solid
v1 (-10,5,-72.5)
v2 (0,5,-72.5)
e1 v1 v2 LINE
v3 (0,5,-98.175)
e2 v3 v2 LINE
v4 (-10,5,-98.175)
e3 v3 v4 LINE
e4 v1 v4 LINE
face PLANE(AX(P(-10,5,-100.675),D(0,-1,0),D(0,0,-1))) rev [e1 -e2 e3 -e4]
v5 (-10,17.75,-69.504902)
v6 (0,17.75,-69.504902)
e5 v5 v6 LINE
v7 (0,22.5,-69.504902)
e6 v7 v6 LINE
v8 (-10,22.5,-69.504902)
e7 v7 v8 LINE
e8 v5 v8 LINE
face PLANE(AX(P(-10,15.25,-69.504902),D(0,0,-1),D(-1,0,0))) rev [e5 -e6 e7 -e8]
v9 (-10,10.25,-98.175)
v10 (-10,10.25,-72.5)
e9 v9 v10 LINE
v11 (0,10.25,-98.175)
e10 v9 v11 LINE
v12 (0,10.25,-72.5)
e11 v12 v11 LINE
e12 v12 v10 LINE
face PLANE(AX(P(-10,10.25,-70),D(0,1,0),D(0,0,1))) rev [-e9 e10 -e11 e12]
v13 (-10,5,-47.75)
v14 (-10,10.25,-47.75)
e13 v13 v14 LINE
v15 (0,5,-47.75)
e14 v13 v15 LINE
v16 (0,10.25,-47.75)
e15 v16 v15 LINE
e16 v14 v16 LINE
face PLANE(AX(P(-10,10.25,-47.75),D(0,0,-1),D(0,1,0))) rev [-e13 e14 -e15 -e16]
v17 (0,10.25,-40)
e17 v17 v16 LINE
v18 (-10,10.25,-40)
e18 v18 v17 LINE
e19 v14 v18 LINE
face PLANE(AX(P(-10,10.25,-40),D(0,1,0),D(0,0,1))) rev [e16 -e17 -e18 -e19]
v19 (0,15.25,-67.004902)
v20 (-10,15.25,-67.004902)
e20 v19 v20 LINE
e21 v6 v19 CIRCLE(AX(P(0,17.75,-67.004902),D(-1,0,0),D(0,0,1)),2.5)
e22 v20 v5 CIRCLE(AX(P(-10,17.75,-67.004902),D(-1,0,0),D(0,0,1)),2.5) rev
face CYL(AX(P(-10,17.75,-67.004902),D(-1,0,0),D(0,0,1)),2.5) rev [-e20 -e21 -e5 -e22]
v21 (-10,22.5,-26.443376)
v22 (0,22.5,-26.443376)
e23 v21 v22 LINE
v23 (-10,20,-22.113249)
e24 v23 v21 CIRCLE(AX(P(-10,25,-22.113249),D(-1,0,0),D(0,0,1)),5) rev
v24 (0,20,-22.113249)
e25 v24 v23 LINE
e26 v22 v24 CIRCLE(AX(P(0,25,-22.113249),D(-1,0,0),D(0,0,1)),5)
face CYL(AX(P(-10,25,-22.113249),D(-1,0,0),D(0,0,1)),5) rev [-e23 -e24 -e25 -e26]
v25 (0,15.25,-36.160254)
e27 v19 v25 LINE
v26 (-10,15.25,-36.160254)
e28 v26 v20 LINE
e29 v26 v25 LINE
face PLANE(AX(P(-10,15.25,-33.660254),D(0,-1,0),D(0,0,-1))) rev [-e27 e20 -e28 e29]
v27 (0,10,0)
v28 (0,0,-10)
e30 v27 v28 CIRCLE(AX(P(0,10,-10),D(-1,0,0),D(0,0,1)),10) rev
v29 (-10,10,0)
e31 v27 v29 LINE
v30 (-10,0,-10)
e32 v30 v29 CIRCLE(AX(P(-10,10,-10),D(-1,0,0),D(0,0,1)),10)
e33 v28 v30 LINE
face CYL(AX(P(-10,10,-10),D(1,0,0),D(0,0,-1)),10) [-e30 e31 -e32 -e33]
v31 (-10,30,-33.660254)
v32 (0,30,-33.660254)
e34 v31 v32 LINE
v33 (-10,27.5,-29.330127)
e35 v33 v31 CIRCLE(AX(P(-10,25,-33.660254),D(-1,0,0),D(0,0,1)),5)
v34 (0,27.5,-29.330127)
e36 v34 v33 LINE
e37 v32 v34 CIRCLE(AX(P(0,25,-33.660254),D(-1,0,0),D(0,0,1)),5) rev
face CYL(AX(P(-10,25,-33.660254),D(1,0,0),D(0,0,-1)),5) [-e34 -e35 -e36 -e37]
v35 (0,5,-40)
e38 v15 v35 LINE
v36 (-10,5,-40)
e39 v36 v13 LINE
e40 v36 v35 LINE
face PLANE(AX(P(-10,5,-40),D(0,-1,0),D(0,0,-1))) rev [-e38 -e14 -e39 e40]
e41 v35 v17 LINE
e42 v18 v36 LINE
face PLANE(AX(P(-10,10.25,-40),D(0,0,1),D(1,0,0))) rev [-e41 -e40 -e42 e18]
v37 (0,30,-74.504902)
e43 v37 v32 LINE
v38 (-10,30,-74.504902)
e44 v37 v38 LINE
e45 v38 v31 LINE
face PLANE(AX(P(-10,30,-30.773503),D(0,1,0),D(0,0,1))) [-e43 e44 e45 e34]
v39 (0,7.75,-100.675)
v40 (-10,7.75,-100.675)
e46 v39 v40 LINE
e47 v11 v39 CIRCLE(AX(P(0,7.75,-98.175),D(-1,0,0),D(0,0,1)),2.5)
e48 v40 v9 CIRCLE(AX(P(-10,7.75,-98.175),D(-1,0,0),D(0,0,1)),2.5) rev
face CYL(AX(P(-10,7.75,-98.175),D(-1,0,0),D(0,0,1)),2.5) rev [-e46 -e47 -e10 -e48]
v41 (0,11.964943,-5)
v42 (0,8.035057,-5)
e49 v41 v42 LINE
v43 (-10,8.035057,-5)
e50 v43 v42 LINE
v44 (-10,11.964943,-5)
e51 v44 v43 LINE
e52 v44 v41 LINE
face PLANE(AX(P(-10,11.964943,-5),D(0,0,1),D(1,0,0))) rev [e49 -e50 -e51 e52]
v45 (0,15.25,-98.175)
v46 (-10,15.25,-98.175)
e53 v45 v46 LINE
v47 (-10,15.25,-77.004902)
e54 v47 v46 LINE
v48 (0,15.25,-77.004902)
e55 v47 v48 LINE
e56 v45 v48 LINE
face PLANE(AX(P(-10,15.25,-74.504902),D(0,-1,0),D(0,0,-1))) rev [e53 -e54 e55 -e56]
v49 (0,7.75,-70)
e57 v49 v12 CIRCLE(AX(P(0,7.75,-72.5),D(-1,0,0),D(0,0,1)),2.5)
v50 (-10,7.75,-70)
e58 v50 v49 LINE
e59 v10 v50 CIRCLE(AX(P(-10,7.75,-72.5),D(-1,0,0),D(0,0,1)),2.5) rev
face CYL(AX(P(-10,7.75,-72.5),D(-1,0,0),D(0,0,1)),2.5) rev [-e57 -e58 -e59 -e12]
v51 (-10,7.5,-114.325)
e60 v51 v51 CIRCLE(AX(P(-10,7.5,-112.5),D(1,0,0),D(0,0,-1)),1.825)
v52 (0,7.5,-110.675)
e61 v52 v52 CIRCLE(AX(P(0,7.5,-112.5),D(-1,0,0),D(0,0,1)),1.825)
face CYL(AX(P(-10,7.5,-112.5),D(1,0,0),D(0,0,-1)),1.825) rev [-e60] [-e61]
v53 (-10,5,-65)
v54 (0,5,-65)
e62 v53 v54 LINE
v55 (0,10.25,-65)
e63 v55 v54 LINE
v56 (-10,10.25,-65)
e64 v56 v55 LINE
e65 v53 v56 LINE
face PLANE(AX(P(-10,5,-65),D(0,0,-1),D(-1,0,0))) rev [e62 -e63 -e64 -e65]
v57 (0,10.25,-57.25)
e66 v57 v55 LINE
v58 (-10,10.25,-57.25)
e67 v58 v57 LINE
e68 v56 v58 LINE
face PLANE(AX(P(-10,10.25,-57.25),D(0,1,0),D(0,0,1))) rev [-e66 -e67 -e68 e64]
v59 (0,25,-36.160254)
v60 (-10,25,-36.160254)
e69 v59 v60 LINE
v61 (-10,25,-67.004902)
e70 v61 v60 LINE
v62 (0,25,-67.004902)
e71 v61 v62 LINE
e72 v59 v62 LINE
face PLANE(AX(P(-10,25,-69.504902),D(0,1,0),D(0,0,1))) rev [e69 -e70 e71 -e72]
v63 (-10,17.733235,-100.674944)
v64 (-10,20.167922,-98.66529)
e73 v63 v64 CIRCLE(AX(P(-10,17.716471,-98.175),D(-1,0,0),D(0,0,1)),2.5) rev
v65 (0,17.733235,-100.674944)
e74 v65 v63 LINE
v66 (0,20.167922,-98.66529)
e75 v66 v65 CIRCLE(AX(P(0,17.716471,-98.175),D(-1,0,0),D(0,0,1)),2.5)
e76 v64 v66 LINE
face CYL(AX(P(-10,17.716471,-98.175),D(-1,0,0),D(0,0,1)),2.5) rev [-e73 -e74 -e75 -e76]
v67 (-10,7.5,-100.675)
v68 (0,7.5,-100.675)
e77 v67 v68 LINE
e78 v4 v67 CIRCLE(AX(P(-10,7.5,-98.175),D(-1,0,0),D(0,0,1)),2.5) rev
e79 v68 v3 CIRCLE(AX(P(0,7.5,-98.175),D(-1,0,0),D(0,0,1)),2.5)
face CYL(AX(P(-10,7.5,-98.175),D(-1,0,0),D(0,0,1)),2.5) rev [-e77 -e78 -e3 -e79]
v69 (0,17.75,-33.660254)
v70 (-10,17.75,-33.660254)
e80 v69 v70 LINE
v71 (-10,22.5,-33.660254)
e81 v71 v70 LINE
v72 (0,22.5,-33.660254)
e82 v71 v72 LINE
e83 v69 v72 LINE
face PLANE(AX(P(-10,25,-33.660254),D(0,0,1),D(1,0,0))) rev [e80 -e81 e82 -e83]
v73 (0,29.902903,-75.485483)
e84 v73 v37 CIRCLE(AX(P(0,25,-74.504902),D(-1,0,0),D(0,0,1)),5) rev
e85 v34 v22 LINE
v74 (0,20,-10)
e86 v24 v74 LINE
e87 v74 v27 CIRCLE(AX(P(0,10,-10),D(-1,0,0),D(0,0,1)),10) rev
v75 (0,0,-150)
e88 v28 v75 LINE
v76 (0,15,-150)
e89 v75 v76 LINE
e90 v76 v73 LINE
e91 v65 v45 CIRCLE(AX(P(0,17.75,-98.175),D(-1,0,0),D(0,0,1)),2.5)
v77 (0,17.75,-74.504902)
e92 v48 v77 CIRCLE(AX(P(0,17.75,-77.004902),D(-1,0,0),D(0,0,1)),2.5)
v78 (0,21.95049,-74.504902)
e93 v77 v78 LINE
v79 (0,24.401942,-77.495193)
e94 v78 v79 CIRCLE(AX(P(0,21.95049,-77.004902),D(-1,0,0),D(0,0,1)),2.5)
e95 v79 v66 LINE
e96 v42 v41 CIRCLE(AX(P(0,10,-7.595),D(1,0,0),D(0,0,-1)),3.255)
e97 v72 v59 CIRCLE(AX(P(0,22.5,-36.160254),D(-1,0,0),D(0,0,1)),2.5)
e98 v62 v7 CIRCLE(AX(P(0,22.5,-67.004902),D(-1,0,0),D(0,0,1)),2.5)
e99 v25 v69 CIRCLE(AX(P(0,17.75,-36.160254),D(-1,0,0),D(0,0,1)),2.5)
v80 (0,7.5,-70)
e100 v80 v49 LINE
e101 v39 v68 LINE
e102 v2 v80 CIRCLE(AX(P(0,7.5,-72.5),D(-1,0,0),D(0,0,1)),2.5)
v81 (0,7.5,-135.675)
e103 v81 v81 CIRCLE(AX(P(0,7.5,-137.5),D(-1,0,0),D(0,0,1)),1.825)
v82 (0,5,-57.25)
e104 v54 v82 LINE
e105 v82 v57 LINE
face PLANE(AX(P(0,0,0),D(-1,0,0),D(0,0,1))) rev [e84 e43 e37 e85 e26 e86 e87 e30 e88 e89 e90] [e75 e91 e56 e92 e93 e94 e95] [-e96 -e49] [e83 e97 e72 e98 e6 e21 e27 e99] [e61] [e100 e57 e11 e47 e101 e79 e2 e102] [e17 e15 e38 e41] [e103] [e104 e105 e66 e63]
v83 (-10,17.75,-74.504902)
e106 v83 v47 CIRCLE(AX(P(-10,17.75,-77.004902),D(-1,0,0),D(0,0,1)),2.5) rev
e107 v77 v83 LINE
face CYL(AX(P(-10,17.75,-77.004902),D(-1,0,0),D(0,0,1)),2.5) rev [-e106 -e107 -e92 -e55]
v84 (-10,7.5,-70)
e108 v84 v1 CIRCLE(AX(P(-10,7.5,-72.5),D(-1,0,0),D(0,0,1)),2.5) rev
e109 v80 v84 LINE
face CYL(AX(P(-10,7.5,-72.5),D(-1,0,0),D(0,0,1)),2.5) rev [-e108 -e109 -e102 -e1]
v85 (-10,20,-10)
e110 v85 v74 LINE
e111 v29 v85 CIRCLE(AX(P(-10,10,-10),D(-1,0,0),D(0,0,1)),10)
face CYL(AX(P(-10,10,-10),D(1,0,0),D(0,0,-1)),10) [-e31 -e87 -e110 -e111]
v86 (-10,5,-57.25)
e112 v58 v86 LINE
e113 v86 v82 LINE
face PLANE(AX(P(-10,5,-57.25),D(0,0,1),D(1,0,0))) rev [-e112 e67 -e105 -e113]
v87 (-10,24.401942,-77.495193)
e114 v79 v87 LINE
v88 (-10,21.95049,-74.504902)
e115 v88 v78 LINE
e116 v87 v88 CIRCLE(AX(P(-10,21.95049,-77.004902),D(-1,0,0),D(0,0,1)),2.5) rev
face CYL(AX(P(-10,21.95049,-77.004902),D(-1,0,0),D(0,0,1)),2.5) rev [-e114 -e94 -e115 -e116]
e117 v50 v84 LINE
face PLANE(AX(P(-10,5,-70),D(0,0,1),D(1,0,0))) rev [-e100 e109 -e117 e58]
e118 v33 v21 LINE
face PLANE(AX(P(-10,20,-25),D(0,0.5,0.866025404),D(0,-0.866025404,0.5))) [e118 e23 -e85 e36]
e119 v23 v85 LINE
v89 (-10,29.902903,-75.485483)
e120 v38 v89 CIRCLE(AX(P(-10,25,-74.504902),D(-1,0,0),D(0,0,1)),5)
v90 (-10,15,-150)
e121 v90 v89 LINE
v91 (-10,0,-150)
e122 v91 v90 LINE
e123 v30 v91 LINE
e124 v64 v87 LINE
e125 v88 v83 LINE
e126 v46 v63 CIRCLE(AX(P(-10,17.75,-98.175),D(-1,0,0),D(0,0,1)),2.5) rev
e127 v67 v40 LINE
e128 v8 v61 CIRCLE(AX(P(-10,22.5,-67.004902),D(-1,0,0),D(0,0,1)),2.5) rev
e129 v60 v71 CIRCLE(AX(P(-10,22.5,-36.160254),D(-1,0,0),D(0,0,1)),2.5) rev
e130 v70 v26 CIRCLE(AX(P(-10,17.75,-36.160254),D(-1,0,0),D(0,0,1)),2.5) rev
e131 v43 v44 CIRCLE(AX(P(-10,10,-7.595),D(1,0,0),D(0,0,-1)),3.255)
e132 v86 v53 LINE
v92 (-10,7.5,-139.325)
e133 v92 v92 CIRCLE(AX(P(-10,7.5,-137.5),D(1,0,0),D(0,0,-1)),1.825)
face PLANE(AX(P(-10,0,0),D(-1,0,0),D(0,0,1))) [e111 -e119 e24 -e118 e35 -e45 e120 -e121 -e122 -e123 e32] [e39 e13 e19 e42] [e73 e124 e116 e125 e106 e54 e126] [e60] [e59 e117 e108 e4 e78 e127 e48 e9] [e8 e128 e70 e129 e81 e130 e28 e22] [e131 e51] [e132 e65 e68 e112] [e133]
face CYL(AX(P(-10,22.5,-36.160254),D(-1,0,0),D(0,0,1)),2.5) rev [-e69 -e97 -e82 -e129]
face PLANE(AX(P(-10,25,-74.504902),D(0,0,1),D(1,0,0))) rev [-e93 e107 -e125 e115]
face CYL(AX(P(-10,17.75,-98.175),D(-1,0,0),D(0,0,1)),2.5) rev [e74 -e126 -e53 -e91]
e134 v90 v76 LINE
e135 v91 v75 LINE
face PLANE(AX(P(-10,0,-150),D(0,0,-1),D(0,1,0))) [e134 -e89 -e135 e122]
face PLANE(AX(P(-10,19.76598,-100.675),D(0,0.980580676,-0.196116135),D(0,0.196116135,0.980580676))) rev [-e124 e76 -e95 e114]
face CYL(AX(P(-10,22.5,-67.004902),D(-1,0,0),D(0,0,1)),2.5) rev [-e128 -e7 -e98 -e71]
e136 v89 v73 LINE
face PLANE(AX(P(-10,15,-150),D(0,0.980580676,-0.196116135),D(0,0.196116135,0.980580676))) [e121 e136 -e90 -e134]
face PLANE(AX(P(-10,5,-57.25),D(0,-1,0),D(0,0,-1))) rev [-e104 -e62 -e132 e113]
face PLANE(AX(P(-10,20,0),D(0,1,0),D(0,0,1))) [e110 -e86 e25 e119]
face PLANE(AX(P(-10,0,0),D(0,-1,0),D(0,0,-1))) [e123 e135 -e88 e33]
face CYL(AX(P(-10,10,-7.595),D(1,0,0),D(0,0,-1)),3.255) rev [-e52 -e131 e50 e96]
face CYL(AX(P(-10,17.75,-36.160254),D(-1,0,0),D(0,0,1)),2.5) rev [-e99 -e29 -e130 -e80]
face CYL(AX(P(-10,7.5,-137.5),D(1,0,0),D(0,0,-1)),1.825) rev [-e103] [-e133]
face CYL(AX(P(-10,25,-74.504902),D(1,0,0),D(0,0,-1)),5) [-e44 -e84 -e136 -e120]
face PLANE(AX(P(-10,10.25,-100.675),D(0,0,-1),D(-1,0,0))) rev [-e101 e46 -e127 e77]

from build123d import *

# Parameters (mm, degrees)
BOSS_EXTRUDE1_DEPTH     = 10
CUT_EXTRUDE2_DEPTH      = 154.297097168
FILLET1_R               = 10
FILLET2_R               = 5
CUT_EXTRUDE3_DEPTH      = 154.297097168
CUT_EXTRUDE3_DEPTH_BACK = 154.297097168
SKETCH3_W               = 7.75
SKETCH3_H               = 5.25
CUT_EXTRUDE6_DEPTH      = 154.297097168
CUT_EXTRUDE6_DEPTH_BACK = 154.297097168
SKETCH6_R               = 1.825
FILLET3_R               = 5
CUT_EXTRUDE7_DEPTH      = 154.297097168
CUT_EXTRUDE7_DEPTH_BACK = 154.297097168
SKETCH7_W               = 35.844648394
SKETCH7_H               = 9.75
SKETCH7_W_2             = 30.675
SKETCH7_H_2             = 5.25
FILLET4_R               = 2.5


# Some blends are built 0.0001 mm under size
with BuildPart() as part:
    # Sketch1 → Boss-Extrude1 (new body)
    with BuildSketch(Plane(origin=(0, 0, 0), x_dir=(0, 0, -1), z_dir=(1, 0, 0))):
        Polygon((0, 0), (150, 0), (150, 15), (75, 30), (30.773502692, 30), (25, 20), (0, 20), align=None)
    extrude(amount=-BOSS_EXTRUDE1_DEPTH)

    # Sketch2 → Cut-Extrude2 (cut, through all)
    with BuildSketch(Plane(origin=(0, 0, 0), x_dir=(0, 0, -1), z_dir=(1, 0, 0))):
        with BuildLine():
            Line((5, 11.964942747), (5, 8.035057253))
            ThreePointArc((5, 8.035057253), (10.85, 10), (5, 11.964942747))
        make_face()
    extrude(amount=-CUT_EXTRUDE2_DEPTH, mode=Mode.SUBTRACT)

    # Fillet1
    fillet1_edges = [part.edges().sort_by_distance(p)[0] for p in [
        (-5, 0, 0),
        (-5, 20, 0),
    ]]
    fillet(fillet1_edges, radius=FILLET1_R - 0.0001)  # a hair under: the kernel refuses the full size

    # Fillet2
    fillet2_edges = [part.edges().sort_by_distance(p)[0] for p in [
        (-5, 30, -30.773502692),
        (-5, 30, -75),
    ]]
    fillet(fillet2_edges, radius=FILLET2_R)

    # Sketch3 → Cut-Extrude3 (cut, two sides: drawn at the far end of the back side and taken through both)
    with BuildSketch(Plane(origin=(0, 0, 0), x_dir=(0, 0, -1), z_dir=(1, 0, 0)).offset(-CUT_EXTRUDE3_DEPTH_BACK)):
        with Locations((61.125, 7.625)):
            Rectangle(SKETCH3_W, SKETCH3_H)
        with Locations((43.875, 7.625)):
            Rectangle(SKETCH3_W, SKETCH3_H)
    extrude(amount=CUT_EXTRUDE3_DEPTH + CUT_EXTRUDE3_DEPTH_BACK, mode=Mode.SUBTRACT)

    # Sketch6 → Cut-Extrude6 (cut, two sides: drawn at the far end of the back side and taken through both)
    with BuildSketch(Plane(origin=(0, 0, 0), x_dir=(0, 0, -1), z_dir=(1, 0, 0)).offset(-CUT_EXTRUDE6_DEPTH_BACK)):
        with Locations((112.5, 7.5)):
            Circle(SKETCH6_R)
        with Locations((137.5, 7.5)):
            Circle(SKETCH6_R)
    extrude(amount=CUT_EXTRUDE6_DEPTH + CUT_EXTRUDE6_DEPTH_BACK, mode=Mode.SUBTRACT)

    # Fillet3
    fillet3_edges = [part.edges().sort_by_distance(p)[0] for p in [
        (-5, 20, -25),
    ]]
    fillet(fillet3_edges, radius=FILLET3_R)

    # Sketch7 → Cut-Extrude7 (cut, two sides: drawn at the far end of the back side and taken through both)
    with BuildSketch(Plane(origin=(0, 0, 0), x_dir=(0, 0, -1), z_dir=(1, 0, 0)).offset(-CUT_EXTRUDE7_DEPTH_BACK)):
        with Locations((51.582578235, 20.125)):
            Rectangle(SKETCH7_W, SKETCH7_H)
        with Locations((85.3375, 7.625)):
            Rectangle(SKETCH7_W_2, SKETCH7_H_2)
        Polygon((100.675, 15.25), (100.675, 19.765980486), (74.504902432, 25), (74.504902432, 15.25), align=None)
    extrude(amount=CUT_EXTRUDE7_DEPTH + CUT_EXTRUDE7_DEPTH_BACK, mode=Mode.SUBTRACT)

    # Fillet4
    # the kernel refuses this fillet: 2.5 mm, written as the material it adds along each edge
    with BuildSketch(Plane(origin=(0, 15.25, -69.504902432), x_dir=(0, 0, 1), z_dir=(-1, 0, 0)), Plane(origin=(-10, 25, -33.660254038), x_dir=(0, -1, 0), z_dir=(1, 0, 0)), Plane(origin=(0, 25, -69.504902432), x_dir=(0, -1, 0), z_dir=(-1, 0, 0)), Plane(origin=(0, 15.25, -74.504902432), x_dir=(0, 1, 0), z_dir=(-1, 0, 0)), Plane(origin=(0, 15.25, -100.675), x_dir=(0, 0, 1), z_dir=(-1, 0, 0)), Plane(origin=(0, 5, -100.675), x_dir=(0, 0, 1), z_dir=(-1, 0, 0))) as fillet4_piece_1:
        with BuildLine():
            CenterArc((FILLET4_R, FILLET4_R), FILLET4_R, 180, 90)
            Line((0, FILLET4_R), (0, 0))
            Line((0, 0), (FILLET4_R, 0))
        make_face()
    extrude(amount=10)
    with BuildSketch(Plane(origin=(-10, 15.25, -33.660254038), x_dir=(0, 1, 0), z_dir=(1, 0, 0)), Plane(origin=(-10, 5, -70), x_dir=(0, 1, 0), z_dir=(1, 0, 0)), Plane(origin=(-10, 10.25, -70), x_dir=(0, 0, -1), z_dir=(1, 0, 0)), Plane(origin=(0, 10.25, -100.675), x_dir=(0, 0, 1), z_dir=(-1, 0, 0))) as fillet4_piece_2:
        with BuildLine():
            CenterArc((FILLET4_R, -FILLET4_R), FILLET4_R, 90, 90)
            Line((0, -FILLET4_R), (0, 0))
            Line((0, 0), (FILLET4_R, 0))
        make_face()
    extrude(amount=10)
    with BuildSketch(Plane(origin=(-10, 25, -74.504902432), x_dir=(0, -0.1961161351381845, -0.9805806756909201), z_dir=(1, 0, 0))) as fillet4_piece_3:
        with BuildLine():
            CenterArc((FILLET4_R * 1.21980390272, -FILLET4_R), FILLET4_R, 90, 101.309932474)
            Line((FILLET4_R * 0.239223227028, -FILLET4_R * 1.19611613514), (0, 0))
            Line((0, 0), (FILLET4_R * 1.21980390272, 0))
        make_face()
    extrude(amount=10)
    with BuildSketch(Plane(origin=(-10, 19.765980486, -100.675), x_dir=(0, 0.19611613513818169, 0.9805806756909206), z_dir=(1, 0, 0))) as fillet4_piece_4:
        with BuildLine():
            CenterArc((FILLET4_R * 0.819803902719, FILLET4_R), FILLET4_R, 191.309932474, 78.690067526)
            Line((-FILLET4_R * 0.160776772972, FILLET4_R * 0.803883864862), (0, 0))
            Line((0, 0), (FILLET4_R * 0.819803902719, 0))
        make_face()
    extrude(amount=10)


solid = part.part
